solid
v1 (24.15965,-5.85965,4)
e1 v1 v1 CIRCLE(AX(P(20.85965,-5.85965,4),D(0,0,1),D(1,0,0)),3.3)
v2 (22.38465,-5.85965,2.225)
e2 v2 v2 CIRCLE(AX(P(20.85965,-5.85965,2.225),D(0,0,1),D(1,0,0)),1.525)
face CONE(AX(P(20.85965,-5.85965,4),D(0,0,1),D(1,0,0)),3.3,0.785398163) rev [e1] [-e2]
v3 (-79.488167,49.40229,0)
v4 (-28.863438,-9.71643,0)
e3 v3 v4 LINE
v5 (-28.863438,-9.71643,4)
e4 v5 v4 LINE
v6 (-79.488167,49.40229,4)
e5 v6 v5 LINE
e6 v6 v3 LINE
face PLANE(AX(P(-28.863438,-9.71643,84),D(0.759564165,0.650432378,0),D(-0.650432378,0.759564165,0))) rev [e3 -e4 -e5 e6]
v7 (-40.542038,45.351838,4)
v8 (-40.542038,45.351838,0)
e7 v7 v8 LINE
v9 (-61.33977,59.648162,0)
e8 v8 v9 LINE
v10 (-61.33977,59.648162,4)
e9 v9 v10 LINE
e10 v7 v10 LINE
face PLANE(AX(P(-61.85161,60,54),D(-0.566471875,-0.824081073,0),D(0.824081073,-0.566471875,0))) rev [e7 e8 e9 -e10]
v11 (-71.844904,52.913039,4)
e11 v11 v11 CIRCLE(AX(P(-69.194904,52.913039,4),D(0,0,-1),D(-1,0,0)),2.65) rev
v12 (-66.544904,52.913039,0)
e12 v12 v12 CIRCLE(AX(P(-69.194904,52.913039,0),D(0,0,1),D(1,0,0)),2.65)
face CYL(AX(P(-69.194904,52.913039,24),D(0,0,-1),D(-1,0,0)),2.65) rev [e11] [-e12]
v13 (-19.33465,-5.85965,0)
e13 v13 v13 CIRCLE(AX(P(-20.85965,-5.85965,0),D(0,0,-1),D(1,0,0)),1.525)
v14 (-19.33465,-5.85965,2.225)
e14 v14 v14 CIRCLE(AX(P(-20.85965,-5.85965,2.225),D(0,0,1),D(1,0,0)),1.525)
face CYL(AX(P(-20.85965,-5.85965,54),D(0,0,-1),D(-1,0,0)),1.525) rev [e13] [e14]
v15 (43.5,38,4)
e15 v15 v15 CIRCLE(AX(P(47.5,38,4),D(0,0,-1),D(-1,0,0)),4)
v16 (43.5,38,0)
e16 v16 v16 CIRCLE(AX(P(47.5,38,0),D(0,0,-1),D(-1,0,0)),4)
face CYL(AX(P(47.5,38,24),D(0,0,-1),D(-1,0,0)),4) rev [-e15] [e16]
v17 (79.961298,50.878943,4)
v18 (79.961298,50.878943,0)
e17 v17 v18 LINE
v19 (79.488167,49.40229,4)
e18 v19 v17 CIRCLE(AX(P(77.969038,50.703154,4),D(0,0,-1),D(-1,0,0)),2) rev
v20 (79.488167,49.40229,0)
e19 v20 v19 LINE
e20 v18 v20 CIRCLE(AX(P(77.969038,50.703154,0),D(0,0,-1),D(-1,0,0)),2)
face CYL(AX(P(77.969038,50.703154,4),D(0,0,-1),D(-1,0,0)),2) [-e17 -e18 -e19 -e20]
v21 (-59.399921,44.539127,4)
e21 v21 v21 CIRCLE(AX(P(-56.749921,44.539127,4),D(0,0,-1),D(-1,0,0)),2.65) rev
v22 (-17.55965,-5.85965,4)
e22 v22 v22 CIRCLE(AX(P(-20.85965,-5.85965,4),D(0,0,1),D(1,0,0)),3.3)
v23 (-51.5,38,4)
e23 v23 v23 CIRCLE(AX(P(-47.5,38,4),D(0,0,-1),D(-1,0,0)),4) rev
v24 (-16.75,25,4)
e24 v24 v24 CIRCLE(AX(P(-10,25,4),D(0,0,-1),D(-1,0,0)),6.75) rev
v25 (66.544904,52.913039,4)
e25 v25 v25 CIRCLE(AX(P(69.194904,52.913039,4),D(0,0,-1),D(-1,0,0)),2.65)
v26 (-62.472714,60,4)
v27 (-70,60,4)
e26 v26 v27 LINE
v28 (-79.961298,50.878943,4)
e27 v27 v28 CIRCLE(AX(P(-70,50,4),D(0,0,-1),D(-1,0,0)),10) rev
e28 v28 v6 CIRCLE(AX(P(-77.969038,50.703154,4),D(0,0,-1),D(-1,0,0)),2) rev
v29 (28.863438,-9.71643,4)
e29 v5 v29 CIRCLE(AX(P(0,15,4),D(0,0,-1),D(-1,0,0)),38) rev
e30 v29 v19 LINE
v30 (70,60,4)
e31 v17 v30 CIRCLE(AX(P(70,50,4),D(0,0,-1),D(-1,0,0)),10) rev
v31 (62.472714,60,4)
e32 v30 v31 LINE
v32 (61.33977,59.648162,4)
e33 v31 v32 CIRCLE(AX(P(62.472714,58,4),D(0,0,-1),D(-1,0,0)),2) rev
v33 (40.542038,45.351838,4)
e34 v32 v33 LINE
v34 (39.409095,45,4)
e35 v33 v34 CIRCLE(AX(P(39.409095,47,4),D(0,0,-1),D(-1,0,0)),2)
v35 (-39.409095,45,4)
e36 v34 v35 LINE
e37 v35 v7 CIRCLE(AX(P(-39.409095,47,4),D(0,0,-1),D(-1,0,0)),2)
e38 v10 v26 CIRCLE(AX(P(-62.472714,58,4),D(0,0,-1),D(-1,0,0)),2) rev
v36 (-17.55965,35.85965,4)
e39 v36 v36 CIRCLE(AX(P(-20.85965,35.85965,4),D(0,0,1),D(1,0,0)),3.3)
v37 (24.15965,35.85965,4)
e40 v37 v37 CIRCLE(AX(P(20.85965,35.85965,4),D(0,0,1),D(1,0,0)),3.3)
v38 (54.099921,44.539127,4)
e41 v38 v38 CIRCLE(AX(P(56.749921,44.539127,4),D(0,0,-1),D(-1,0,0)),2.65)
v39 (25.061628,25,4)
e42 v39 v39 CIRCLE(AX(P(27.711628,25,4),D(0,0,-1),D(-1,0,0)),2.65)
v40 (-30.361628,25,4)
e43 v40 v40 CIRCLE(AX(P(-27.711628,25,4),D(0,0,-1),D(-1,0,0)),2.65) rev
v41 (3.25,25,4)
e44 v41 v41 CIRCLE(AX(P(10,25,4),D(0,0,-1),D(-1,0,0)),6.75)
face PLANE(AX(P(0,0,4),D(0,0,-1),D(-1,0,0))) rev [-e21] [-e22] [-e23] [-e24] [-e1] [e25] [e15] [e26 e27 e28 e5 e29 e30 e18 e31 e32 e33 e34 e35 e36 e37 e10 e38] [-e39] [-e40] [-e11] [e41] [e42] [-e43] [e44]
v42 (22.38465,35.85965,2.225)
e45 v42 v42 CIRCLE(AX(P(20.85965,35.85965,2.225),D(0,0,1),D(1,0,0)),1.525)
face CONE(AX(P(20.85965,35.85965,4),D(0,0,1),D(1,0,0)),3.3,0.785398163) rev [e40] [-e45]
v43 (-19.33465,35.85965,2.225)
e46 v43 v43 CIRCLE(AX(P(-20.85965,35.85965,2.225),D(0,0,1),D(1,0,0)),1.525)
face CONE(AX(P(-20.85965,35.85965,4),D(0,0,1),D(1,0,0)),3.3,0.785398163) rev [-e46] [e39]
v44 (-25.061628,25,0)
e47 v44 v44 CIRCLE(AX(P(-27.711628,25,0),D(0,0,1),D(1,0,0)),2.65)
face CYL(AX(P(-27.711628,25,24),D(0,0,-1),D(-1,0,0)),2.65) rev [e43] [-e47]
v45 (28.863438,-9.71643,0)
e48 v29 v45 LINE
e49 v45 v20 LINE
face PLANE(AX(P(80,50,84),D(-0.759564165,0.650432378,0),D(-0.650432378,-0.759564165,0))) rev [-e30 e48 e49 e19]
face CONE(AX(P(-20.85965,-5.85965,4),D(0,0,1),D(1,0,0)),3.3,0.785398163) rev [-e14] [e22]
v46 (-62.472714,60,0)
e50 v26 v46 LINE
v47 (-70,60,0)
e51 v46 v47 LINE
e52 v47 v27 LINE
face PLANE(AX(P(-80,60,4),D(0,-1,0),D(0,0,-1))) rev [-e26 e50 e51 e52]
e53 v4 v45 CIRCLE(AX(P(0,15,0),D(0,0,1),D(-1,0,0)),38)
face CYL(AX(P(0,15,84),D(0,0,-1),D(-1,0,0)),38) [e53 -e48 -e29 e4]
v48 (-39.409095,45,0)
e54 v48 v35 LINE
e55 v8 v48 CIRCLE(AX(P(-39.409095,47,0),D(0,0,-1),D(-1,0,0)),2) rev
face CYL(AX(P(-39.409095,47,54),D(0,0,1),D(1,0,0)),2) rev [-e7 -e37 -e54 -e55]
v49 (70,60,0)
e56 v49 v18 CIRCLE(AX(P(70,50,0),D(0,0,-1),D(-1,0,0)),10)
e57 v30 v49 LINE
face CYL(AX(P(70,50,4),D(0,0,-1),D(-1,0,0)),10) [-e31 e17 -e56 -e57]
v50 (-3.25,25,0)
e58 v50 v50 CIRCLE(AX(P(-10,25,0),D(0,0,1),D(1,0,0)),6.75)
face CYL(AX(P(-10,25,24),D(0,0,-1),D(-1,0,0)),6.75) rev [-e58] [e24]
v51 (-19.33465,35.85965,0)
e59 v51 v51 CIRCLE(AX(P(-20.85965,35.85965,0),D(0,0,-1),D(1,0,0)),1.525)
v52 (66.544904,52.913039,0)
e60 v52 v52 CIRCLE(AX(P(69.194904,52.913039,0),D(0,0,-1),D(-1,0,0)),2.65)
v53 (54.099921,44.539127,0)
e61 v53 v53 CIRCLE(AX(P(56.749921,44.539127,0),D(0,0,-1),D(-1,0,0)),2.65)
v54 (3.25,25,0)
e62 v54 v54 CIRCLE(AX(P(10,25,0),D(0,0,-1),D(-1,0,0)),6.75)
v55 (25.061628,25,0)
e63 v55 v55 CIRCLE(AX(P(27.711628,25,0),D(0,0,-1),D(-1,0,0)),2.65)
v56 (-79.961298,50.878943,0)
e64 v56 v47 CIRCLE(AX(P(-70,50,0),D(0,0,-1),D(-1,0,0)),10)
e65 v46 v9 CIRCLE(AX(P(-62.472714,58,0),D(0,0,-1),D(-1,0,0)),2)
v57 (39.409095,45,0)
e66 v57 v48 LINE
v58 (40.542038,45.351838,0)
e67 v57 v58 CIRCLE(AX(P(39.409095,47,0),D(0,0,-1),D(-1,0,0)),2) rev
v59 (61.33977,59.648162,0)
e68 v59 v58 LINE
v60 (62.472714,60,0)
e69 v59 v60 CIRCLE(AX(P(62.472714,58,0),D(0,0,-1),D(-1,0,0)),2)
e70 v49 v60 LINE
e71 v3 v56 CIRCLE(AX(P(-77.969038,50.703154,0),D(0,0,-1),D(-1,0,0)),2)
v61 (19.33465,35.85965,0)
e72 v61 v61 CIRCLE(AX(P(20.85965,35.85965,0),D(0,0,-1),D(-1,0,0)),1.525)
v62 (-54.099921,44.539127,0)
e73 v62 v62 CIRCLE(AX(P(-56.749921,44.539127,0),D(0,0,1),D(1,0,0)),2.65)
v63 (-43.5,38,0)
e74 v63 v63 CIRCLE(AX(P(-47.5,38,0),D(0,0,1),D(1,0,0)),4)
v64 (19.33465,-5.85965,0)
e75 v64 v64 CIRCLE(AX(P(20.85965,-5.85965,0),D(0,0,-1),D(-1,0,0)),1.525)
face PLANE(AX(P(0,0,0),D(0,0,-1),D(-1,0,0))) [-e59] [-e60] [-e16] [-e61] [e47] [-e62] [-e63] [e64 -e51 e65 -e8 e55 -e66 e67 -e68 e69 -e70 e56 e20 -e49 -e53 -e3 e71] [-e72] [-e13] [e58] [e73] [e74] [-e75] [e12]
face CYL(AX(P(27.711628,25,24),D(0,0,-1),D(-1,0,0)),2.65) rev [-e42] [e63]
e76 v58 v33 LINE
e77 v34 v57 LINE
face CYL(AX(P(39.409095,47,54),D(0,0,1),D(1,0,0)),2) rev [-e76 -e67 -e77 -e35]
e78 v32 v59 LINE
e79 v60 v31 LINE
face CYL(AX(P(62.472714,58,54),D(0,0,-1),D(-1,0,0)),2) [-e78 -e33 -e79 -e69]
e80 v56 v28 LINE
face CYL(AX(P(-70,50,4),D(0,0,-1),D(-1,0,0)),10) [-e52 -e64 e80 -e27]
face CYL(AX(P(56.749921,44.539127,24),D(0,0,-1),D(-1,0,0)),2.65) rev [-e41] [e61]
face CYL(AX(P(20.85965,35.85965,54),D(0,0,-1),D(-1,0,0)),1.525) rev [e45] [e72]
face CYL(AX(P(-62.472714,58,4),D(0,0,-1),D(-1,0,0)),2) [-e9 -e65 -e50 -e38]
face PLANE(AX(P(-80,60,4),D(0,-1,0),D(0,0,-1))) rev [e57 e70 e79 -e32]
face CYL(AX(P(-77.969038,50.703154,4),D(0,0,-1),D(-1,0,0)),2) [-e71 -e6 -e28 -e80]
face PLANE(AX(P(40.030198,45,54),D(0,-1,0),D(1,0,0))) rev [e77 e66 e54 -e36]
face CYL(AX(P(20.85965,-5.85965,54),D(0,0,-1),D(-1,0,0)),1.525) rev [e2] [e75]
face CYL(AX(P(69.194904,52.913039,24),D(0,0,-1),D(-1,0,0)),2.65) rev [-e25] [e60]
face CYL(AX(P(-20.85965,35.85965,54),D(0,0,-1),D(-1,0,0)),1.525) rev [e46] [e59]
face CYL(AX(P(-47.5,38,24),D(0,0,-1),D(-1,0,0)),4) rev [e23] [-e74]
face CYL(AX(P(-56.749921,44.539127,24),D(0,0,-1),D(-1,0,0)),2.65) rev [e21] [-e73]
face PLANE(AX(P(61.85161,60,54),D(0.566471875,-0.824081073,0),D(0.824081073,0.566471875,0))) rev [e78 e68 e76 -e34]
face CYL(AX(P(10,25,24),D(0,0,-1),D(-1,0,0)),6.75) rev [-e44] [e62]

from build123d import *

# Parameters (mm, degrees)
SKETCH_1_W                   = 160
SKETCH_1_H                   = 120
EXTRUDE_1_DEPTH              = 4
SKETCH_2_R                   = 4
SKETCH_2_R_2                 = 2.65
SKETCH_2_R_3                 = 6.75
CUT_EXTRUDE_1_DEPTH          = 24
CUT_EXTRUDE_2_DEPTH          = 54
SKETCH_5_R                   = 1.525
CUT_EXTRUDE_3_DEPTH          = 54
CUT_EXTRUDE_4_DEPTH          = 84
FILLET_1_R                   = 10
HOLE_WIZARD_M3_1_D           = 3.05
HOLE_WIZARD_M3_1_DEPTH       = 7.5
HOLE_WIZARD_M3_1_CSINK_D     = 6.6
HOLE_WIZARD_M3_1_CSINK_ANGLE = 90
HOLE_WIZARD_M3_1_TIP         = 0.916312444
FILLET_2_R                   = 2


with BuildPart() as part:
    # 草图1 → 凸台-拉伸1 (new body)
    with BuildSketch(Plane.XY):
        Rectangle(SKETCH_1_W, SKETCH_1_H)
    extrude(amount=EXTRUDE_1_DEPTH)

    # 草图2 → 切除-拉伸1 (cut)
    with BuildSketch(Plane(origin=(0, 0, 0), x_dir=(-1, 0, 0), z_dir=(0, 0, -1))):
        with Locations((-47.5, 38)):
            Circle(SKETCH_2_R)
        with Locations((-56.749921469, 44.53912734)):
            Circle(SKETCH_2_R_2)
        with Locations((-69.194904497, 52.913039057)):
            Circle(SKETCH_2_R_2)
        with Locations((-27.711627738, 25)):
            Circle(SKETCH_2_R_2)
        with Locations((-10, 25)):
            Circle(SKETCH_2_R_3)
    cut_extrude_1 = extrude(amount=-CUT_EXTRUDE_1_DEPTH, mode=Mode.SUBTRACT)

    # 镜向1: 切除-拉伸1 across plane
    add(cut_extrude_1.mirror(Plane(origin=(0, 0, 0), x_dir=(0, 0, 1), z_dir=(1, 0, 0))), mode=Mode.SUBTRACT)

    # 草图3 → 切除-拉伸2 (cut)
    with BuildSketch(Plane(origin=(0, 0, 0), x_dir=(-1, 0, 0), z_dir=(0, 0, -1))):
        Polygon((-61.851610318, 60), (-40.030198451, 45), (40.030198451, 45), (61.851610318, 60), align=None)
    extrude(amount=-CUT_EXTRUDE_2_DEPTH, mode=Mode.SUBTRACT)

    # 草图5 → 切除-拉伸3 (cut)
    with BuildSketch(Plane(origin=(0, 0, 0), x_dir=(-1, 0, 0), z_dir=(0, 0, -1))):
        with Locations((-20.859650045, 35.859650045)):
            Circle(SKETCH_5_R)
        with Locations((-20.859650045, -5.859650045)):
            Circle(SKETCH_5_R)
        with Locations((20.859650045, -5.859650045)):
            Circle(SKETCH_5_R)
        with Locations((20.859650045, 35.859650045)):
            Circle(SKETCH_5_R)
    extrude(amount=-CUT_EXTRUDE_3_DEPTH, mode=Mode.SUBTRACT)

    # 草图6 → 切除-拉伸4 (cut)
    with BuildSketch(Plane(origin=(0, 0, 0), x_dir=(-1, 0, 0), z_dir=(0, 0, -1))):
        with BuildLine():
            Line((-80, 50), (-28.863438287, -9.71643037))
            ThreePointArc((-28.863438287, -9.71643037), (0, -23), (28.863438287, -9.71643037))
            Line((28.863438287, -9.71643037), (80, 50))
            Line((80, 50), (80, -60))
            Line((80, -60), (-80, -60))
            Line((-80, -60), (-80, 50))
        make_face()
    extrude(amount=-CUT_EXTRUDE_4_DEPTH, mode=Mode.SUBTRACT)

    # 圆角1
    fillet_1_edges = [part.edges().sort_by_distance(p)[0] for p in [
        (-80, 60, 2),
        (80, 60, 2),
    ]]
    fillet(fillet_1_edges, radius=FILLET_1_R - 0.0001)  # a hair under: the kernel refuses the full size

    # M3 十字槽半沉头木螺钉的锥形沉头孔1
    with Locations(Plane.XY.offset(4)):
        with Locations((-20.859650045, 35.859650045), (20.859650045, 35.859650045), (20.859650045, -5.859650045), (-20.859650045, -5.859650045)):
            CounterSinkHole(HOLE_WIZARD_M3_1_D / 2, HOLE_WIZARD_M3_1_CSINK_D / 2, depth=HOLE_WIZARD_M3_1_DEPTH, counter_sink_angle=HOLE_WIZARD_M3_1_CSINK_ANGLE)
            with Locations((0, 0, -(HOLE_WIZARD_M3_1_DEPTH + HOLE_WIZARD_M3_1_TIP / 2))):  # 118° drill point
                Cone(0, HOLE_WIZARD_M3_1_D / 2, HOLE_WIZARD_M3_1_TIP, mode=Mode.SUBTRACT)

    # 圆角2
    fillet_2_edges = [part.edges().sort_by_distance(p)[0] for p in [
        (80, 50, 2),
        (-80, 50, 2),
        (61.851610318, 60, 2),
        (-61.851610318, 60, 2),
        (-40.030198451, 45, 2),
        (40.030198451, 45, 2),
    ]]
    fillet(fillet_2_edges, radius=FILLET_2_R)


solid = part.part
